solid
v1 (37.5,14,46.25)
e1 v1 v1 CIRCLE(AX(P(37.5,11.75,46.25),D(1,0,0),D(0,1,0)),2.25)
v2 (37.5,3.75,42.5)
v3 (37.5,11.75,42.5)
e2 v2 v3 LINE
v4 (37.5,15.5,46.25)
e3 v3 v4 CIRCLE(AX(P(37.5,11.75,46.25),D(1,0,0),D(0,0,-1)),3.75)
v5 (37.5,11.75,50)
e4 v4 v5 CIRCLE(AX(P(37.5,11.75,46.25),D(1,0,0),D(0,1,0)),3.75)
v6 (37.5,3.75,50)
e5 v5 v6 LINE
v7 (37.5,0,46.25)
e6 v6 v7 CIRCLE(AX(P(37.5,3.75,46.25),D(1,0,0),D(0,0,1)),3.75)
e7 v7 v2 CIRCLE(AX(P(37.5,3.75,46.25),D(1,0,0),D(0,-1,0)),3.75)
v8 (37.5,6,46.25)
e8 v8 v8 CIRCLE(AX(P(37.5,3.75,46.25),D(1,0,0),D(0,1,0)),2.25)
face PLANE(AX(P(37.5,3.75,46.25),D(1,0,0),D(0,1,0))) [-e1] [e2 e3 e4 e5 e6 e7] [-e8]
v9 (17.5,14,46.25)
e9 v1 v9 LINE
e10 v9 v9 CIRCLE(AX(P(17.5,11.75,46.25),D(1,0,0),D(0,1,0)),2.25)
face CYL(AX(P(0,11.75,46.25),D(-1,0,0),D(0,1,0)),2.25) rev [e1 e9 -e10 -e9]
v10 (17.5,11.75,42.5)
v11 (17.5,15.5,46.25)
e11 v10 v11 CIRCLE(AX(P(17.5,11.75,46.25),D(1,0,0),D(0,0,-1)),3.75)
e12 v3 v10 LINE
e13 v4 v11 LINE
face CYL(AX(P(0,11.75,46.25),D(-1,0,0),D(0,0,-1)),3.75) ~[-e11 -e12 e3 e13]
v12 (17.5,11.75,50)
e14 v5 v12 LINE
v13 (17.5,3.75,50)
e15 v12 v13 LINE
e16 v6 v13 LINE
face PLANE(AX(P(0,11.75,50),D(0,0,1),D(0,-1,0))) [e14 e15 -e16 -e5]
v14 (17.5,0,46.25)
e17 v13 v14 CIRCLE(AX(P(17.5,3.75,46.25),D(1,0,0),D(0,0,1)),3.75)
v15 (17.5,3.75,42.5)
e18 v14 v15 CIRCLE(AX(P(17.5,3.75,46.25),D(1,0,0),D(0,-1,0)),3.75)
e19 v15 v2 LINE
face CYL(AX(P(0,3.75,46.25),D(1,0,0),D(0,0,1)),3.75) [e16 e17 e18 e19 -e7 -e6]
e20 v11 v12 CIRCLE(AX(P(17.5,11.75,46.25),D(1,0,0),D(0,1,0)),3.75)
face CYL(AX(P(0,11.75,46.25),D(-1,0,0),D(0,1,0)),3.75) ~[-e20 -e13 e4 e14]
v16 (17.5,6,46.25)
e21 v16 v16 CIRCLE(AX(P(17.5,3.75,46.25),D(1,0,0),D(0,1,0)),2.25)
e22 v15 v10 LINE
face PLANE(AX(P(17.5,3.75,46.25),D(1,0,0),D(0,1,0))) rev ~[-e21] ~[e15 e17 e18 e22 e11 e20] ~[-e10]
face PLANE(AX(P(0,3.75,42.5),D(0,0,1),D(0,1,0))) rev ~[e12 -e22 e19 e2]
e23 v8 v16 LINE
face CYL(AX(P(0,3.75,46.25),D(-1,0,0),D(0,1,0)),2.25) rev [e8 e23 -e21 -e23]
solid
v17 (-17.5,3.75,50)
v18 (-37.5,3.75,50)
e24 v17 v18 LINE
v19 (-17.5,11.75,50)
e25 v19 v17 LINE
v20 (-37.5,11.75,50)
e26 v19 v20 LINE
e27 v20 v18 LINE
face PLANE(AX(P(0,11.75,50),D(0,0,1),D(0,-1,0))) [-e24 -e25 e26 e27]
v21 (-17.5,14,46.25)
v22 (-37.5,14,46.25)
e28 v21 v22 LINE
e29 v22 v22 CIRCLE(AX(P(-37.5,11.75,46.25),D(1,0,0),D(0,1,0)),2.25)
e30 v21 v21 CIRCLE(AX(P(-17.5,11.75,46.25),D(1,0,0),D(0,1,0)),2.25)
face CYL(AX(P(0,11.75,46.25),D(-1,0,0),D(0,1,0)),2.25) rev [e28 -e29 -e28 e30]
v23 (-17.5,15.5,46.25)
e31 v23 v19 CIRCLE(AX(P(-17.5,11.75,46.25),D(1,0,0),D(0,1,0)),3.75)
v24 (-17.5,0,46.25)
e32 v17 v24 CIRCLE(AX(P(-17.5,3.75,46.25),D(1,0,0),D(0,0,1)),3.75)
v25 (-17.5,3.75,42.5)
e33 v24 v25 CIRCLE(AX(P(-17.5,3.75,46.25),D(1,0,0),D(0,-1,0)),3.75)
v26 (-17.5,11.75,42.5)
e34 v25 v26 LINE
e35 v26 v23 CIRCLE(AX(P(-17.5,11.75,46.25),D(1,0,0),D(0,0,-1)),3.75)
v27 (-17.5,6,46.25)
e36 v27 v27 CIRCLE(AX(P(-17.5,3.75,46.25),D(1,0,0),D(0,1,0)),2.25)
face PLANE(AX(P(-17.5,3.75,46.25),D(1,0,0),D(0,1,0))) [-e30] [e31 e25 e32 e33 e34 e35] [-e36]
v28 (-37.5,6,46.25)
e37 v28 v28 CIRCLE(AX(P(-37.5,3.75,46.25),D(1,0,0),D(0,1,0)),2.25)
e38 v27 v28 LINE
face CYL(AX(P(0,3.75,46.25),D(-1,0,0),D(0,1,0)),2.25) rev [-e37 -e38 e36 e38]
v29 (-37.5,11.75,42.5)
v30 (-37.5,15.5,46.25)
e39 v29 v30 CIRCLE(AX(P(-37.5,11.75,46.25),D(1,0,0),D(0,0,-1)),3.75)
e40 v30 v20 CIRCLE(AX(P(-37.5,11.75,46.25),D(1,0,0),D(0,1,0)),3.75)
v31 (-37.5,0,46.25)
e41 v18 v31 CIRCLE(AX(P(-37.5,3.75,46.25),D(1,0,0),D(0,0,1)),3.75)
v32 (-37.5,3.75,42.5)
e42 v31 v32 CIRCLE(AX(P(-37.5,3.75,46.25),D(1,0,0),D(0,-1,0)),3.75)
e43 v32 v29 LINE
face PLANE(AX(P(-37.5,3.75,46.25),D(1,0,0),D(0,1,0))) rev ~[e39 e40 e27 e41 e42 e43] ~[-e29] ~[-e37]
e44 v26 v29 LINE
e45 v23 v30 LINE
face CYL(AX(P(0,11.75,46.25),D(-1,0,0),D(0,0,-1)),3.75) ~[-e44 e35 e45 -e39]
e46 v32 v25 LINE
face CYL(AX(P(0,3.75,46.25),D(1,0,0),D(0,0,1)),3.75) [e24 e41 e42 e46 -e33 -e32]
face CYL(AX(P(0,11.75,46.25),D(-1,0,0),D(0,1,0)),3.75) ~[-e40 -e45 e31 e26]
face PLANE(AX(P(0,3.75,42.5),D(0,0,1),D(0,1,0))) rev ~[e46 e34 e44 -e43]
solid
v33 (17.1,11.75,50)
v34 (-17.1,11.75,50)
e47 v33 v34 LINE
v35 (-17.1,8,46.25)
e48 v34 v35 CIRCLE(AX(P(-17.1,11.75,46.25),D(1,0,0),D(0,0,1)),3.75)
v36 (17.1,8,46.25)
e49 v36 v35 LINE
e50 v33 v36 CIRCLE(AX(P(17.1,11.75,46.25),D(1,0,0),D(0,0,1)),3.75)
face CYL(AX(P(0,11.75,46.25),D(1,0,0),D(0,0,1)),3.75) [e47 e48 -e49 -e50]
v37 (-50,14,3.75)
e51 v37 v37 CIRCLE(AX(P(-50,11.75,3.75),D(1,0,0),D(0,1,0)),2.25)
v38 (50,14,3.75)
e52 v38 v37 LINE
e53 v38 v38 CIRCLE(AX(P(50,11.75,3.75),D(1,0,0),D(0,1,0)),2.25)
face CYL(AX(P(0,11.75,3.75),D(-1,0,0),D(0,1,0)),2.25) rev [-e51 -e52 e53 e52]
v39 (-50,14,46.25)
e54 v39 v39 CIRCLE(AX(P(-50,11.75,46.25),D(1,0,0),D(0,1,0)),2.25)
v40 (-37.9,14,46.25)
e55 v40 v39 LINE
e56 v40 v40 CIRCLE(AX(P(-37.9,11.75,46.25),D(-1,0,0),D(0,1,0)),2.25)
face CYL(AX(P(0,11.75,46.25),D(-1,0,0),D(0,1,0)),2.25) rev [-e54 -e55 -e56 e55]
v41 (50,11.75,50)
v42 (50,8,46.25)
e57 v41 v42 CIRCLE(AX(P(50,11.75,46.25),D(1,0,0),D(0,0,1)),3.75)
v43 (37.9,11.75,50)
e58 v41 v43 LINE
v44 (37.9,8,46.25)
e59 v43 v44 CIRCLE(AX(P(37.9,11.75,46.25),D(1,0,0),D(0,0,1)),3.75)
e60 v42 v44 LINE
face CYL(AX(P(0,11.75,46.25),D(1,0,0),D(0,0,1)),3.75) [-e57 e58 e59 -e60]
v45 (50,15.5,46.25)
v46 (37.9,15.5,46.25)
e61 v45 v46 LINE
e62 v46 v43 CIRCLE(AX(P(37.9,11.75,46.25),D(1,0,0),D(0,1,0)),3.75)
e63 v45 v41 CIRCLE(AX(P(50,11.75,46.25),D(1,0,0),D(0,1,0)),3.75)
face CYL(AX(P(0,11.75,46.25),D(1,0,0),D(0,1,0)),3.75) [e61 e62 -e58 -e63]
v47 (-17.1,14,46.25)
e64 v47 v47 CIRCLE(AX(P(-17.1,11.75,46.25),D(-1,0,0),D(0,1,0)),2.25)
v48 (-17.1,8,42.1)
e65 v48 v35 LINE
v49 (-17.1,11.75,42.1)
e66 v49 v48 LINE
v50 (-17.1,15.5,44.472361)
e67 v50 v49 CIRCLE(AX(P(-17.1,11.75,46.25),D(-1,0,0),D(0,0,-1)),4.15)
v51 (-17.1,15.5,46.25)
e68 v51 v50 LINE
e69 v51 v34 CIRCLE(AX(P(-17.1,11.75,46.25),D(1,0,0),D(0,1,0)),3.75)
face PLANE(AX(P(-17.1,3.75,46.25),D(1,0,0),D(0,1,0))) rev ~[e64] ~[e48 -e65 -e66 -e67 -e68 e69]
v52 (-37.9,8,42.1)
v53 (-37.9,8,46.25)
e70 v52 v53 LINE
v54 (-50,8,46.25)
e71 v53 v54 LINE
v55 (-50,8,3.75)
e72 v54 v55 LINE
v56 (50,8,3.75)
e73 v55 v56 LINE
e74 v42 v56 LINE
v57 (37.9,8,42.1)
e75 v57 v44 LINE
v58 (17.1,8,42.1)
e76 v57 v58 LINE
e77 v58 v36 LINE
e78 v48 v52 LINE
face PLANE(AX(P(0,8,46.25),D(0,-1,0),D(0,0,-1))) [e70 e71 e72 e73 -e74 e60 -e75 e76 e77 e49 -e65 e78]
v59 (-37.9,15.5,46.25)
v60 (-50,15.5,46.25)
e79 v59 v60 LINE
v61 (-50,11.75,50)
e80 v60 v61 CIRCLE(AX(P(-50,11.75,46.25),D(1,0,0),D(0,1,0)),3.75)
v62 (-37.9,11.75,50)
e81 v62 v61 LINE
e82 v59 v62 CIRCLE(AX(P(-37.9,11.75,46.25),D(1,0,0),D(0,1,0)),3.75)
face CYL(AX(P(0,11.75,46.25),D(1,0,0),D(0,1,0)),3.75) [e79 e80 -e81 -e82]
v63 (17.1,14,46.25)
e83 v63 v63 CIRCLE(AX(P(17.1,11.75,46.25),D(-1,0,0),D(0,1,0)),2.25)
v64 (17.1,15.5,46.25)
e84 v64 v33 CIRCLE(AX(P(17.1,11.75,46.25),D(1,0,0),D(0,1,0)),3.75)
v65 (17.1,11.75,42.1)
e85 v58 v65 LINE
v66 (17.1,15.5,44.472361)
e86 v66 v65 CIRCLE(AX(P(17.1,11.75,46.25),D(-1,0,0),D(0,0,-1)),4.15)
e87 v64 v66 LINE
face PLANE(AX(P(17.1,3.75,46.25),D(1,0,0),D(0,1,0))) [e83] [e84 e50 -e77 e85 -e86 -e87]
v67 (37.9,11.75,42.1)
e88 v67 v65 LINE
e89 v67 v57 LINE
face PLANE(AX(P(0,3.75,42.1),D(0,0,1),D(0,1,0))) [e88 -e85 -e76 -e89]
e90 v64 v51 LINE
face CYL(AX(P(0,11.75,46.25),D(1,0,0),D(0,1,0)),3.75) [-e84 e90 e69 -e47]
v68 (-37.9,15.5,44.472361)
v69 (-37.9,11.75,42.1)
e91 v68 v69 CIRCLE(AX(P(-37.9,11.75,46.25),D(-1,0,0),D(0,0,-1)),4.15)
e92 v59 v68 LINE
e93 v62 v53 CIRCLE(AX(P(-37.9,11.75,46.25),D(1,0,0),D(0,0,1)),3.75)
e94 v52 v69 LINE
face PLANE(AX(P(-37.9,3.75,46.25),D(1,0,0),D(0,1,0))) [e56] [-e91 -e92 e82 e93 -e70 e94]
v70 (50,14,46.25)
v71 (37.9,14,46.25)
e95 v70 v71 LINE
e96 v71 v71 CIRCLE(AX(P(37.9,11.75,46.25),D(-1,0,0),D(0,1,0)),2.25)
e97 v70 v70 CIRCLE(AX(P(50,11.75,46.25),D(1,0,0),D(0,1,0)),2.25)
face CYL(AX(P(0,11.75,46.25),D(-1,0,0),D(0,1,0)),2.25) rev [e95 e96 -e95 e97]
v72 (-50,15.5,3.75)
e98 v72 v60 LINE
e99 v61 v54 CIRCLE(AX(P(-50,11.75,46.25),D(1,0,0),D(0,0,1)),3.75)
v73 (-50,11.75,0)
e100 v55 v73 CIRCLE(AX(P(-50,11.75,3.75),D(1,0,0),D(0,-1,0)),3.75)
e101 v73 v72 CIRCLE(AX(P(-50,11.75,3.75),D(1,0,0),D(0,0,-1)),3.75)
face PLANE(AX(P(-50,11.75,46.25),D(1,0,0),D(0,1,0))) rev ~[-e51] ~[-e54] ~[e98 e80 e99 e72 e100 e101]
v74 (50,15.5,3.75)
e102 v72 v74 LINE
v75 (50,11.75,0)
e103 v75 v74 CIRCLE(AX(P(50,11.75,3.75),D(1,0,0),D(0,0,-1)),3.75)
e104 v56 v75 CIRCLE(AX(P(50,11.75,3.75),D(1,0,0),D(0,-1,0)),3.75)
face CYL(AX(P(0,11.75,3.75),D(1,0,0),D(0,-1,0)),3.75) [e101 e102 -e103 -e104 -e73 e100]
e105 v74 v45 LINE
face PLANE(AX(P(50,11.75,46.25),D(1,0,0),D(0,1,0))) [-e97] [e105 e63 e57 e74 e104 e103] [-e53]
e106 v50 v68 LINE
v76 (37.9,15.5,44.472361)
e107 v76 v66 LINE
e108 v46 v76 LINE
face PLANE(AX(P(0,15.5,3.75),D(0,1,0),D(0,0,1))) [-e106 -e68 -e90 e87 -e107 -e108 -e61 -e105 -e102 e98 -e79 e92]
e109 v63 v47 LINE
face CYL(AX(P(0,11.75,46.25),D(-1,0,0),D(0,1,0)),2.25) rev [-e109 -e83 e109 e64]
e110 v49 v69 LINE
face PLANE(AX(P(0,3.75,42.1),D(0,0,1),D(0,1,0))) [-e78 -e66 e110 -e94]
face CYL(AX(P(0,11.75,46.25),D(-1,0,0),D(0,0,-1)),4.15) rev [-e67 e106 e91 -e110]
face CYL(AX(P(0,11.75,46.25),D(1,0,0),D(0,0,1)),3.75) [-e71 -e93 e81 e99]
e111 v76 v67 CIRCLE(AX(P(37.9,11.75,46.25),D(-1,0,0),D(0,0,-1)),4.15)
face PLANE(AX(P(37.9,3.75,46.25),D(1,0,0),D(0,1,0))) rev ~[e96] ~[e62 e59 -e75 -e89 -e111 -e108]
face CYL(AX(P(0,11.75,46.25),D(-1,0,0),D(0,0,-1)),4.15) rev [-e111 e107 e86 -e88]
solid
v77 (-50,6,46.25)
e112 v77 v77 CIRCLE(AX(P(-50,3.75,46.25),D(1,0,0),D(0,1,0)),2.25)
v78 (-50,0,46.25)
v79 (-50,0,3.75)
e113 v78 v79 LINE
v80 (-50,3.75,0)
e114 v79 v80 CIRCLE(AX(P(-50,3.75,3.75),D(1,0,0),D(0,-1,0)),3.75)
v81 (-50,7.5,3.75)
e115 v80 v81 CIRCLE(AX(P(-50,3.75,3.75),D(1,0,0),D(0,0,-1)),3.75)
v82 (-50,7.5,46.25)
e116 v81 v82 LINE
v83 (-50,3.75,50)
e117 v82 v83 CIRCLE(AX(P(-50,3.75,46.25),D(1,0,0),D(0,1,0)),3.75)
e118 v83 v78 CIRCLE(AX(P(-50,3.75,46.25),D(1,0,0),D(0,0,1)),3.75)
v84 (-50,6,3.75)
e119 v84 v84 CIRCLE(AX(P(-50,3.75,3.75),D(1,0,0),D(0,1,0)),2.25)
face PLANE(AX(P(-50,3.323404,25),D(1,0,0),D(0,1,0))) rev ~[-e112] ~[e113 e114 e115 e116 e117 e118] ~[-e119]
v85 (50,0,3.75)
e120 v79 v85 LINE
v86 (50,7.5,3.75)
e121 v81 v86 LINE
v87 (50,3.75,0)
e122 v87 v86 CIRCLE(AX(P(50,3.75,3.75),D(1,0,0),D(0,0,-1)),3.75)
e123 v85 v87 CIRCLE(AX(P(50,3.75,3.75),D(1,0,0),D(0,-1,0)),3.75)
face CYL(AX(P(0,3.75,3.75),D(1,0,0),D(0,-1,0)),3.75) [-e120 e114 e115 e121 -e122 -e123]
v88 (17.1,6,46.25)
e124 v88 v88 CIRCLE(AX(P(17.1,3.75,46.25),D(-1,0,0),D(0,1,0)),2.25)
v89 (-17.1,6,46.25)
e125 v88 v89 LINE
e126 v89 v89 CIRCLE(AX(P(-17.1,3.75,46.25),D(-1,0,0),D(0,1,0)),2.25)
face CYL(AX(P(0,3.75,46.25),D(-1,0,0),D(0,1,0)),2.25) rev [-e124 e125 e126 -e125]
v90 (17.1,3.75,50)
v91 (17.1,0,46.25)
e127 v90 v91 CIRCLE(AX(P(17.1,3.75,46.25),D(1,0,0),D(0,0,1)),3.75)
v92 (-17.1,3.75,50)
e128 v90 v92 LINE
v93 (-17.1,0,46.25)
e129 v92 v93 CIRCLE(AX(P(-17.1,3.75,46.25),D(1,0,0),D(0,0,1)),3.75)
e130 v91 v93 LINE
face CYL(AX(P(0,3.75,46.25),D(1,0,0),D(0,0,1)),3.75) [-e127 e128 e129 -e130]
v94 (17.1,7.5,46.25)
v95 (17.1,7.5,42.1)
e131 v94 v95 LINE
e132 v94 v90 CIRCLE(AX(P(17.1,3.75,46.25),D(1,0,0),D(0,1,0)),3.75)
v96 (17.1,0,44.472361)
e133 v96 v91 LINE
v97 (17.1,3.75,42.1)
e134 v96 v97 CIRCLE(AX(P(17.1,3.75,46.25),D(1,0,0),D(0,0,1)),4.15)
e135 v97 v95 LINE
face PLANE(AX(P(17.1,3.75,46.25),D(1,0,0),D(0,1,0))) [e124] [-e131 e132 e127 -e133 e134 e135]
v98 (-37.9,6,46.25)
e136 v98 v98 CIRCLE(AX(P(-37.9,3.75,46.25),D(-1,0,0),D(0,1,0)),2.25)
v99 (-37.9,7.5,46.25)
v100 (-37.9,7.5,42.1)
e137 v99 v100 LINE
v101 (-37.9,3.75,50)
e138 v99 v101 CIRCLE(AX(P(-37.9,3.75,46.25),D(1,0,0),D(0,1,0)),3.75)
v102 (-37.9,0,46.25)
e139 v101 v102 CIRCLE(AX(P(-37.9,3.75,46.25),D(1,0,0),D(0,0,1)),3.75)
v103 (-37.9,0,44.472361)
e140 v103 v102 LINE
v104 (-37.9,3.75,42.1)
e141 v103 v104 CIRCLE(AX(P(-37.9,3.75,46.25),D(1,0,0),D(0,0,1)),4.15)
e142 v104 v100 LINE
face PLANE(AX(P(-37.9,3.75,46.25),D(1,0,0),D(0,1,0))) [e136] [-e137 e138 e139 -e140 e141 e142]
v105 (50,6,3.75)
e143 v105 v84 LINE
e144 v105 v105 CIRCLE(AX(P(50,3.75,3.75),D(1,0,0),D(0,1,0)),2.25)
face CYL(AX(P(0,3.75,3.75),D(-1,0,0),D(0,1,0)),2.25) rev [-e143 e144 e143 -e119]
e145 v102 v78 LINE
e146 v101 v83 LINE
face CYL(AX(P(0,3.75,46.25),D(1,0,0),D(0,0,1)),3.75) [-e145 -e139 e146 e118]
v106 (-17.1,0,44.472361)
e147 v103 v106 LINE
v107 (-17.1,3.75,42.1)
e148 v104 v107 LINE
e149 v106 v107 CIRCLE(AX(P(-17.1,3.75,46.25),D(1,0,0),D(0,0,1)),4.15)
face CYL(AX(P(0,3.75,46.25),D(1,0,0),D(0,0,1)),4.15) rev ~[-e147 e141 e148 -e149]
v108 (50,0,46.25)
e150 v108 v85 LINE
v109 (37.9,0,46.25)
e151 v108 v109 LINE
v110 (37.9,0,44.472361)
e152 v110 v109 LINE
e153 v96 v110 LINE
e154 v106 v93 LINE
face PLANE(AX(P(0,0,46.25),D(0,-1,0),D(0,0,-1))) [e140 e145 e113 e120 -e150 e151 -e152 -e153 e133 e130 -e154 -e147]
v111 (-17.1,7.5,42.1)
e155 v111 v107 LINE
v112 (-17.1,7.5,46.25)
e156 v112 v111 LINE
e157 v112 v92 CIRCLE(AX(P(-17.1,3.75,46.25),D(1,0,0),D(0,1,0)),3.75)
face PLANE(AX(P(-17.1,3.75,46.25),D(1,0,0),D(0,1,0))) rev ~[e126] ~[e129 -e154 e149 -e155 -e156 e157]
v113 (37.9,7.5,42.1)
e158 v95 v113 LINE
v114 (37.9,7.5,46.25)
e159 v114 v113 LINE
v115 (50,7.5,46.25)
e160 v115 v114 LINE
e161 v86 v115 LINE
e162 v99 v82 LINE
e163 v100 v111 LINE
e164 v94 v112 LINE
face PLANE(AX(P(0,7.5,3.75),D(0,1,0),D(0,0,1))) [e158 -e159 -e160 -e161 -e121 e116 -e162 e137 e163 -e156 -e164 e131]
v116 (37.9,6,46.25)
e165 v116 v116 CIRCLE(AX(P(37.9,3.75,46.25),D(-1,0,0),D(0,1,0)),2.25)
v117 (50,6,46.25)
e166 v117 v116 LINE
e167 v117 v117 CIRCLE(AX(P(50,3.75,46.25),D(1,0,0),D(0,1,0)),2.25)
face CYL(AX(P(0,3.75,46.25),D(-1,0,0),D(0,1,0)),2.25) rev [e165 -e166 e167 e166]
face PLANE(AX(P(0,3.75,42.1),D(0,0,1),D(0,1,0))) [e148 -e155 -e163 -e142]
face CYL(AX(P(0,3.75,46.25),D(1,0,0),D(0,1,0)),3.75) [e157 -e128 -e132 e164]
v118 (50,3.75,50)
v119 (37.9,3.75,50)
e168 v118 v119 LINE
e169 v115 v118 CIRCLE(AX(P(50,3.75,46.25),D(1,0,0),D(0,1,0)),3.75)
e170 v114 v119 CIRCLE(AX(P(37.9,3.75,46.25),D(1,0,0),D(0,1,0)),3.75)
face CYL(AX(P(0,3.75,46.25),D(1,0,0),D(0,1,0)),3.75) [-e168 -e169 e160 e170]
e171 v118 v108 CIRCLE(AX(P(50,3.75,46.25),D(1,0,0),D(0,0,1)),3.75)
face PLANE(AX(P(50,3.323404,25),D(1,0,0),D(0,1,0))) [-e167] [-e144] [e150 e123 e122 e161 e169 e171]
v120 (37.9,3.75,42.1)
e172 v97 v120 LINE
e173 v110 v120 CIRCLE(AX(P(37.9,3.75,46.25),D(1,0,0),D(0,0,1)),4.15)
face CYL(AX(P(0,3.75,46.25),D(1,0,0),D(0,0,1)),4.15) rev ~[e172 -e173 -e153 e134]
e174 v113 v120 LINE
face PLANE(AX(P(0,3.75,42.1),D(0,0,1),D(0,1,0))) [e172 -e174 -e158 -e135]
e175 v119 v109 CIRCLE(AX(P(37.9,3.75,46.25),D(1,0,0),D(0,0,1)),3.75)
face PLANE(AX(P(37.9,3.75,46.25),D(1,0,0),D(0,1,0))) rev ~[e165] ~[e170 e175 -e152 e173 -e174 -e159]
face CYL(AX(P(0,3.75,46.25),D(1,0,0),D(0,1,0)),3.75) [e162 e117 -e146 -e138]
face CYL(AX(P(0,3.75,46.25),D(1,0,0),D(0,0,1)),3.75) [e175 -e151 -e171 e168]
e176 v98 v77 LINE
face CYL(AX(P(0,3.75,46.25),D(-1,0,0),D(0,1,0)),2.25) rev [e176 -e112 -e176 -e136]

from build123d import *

# Parameters (mm, degrees)
F0_R      = 2.25
F1_DEPTH  = 50
F2_DEPTH  = 37.5
F3_DEPTH  = 17.5
F4_OFFSET = 0.4


with BuildPart() as f1:
    # F0 (on Right) → F1 (new body, symmetric)
    with BuildSketch(Plane.YZ):
        with BuildLine():
            Line((0, 46.25), (0, 3.75))
            ThreePointArc((0, 3.75), (1.0983495706, 6.4016504294), (3.75, 7.5))
            Line((3.75, 7.5), (7.5, 7.5))
            Line((7.5, 7.5), (7.5, 42.5))
            Line((7.5, 42.5), (3.75, 42.5))
            ThreePointArc((3.75, 42.5), (1.0983495706, 43.5983495706), (0, 46.25))
        make_face()
        with BuildLine():
            ThreePointArc((0, 3.75), (1.0983495706, 1.0983495706), (3.75, 0))
            ThreePointArc((3.75, 0), (6.4016504294, 1.0983495706), (7.5, 3.75))
            ThreePointArc((7.5, 3.75), (6.4016504294, 6.4016504294), (3.75, 7.5))
            ThreePointArc((3.75, 7.5), (1.0983495706, 6.4016504294), (0, 3.75))
        make_face()
        with Locations((3.75, 3.75)):
            Circle(F0_R, mode=Mode.SUBTRACT)
        with BuildLine():
            ThreePointArc((3.75, 7.5), (6.4016504294, 6.4016504294), (7.5, 3.75))
            Line((7.5, 3.75), (7.5, 7.5))
            Line((7.5, 7.5), (3.75, 7.5))
        make_face()
        with BuildLine():
            ThreePointArc((7.5, 46.25), (6.4016504294, 43.5983495706), (3.75, 42.5))
            Line((3.75, 42.5), (7.5, 42.5))
            Line((7.5, 42.5), (7.5, 46.25))
        make_face()
        with BuildLine():
            ThreePointArc((3.75, 50), (1.0983495706, 48.9016504294), (0, 46.25))
            ThreePointArc((0, 46.25), (1.0983495706, 43.5983495706), (3.75, 42.5))
            ThreePointArc((3.75, 42.5), (6.4016504294, 43.5983495706), (7.5, 46.25))
            ThreePointArc((7.5, 46.25), (6.4016504294, 48.9016504294), (3.75, 50))
        make_face()
        with Locations((3.75, 46.25)):
            Circle(F0_R, mode=Mode.SUBTRACT)
    extrude(amount=F1_DEPTH, both=True)


with BuildPart() as f1b:
    # F0 (on Right) → F1, piece 2 (new body, symmetric)
    with BuildSketch(Plane.YZ):
        with BuildLine():
            ThreePointArc((15.5, 46.25), (14.4016504294, 48.9016504294), (11.75, 50))
            ThreePointArc((11.75, 50), (9.0983495706, 48.9016504294), (8, 46.25))
            ThreePointArc((8, 46.25), (9.0983495706, 43.5983495706), (11.75, 42.5))
            ThreePointArc((11.75, 42.5), (14.4016504294, 43.5983495706), (15.5, 46.25))
        make_face()
        with Locations((11.75, 46.25)):
            Circle(F0_R, mode=Mode.SUBTRACT)
        with BuildLine():
            Line((8, 46.25), (8, 42.5))
            Line((8, 42.5), (11.75, 42.5))
            ThreePointArc((11.75, 42.5), (9.0983495706, 43.5983495706), (8, 46.25))
        make_face()
        with BuildLine():
            Line((8, 42.5), (8, 7.5))
            Line((8, 7.5), (11.75, 7.5))
            Line((11.75, 7.5), (15.5, 7.5))
            Line((15.5, 7.5), (15.5, 46.25))
            ThreePointArc((15.5, 46.25), (14.4016504294, 43.5983495706), (11.75, 42.5))
            Line((11.75, 42.5), (8, 42.5))
        make_face()
        with BuildLine():
            ThreePointArc((11.75, 7.5), (14.4016504294, 6.4016504294), (15.5, 3.75))
            Line((15.5, 3.75), (15.5, 7.5))
            Line((15.5, 7.5), (11.75, 7.5))
        make_face()
        with BuildLine():
            Line((8, 7.5), (8, 3.75))
            ThreePointArc((8, 3.75), (9.0983495706, 6.4016504294), (11.75, 7.5))
            Line((11.75, 7.5), (8, 7.5))
        make_face()
        with BuildLine():
            ThreePointArc((8, 3.75), (9.0983495706, 1.0983495706), (11.75, 0))
            ThreePointArc((11.75, 0), (14.4016504294, 1.0983495706), (15.5, 3.75))
            ThreePointArc((15.5, 3.75), (14.4016504294, 6.4016504294), (11.75, 7.5))
            ThreePointArc((11.75, 7.5), (9.0983495706, 6.4016504294), (8, 3.75))
        make_face()
        with Locations((11.75, 3.75)):
            Circle(F0_R, mode=Mode.SUBTRACT)
        with BuildLine():
            Line((8, 42.5), (8, 7.5))
            Line((8, 7.5), (11.75, 7.5))
            Line((11.75, 7.5), (15.5, 7.5))
            Line((15.5, 7.5), (15.5, 46.25))
            ThreePointArc((15.5, 46.25), (14.4016504294, 43.5983495706), (11.75, 42.5))
            Line((11.75, 42.5), (8, 42.5))
        make_face()
    extrude(amount=F1_DEPTH, both=True)


with BuildPart() as f2:
    # F0 (on Right) → F2 (new body, symmetric)
    with BuildSketch(Plane.YZ):
        with BuildLine():
            ThreePointArc((3.75, 50), (1.0983495706, 48.9016504294), (0, 46.25))
            ThreePointArc((0, 46.25), (1.0983495706, 43.5983495706), (3.75, 42.5))
            ThreePointArc((3.75, 42.5), (6.4016504294, 43.5983495706), (7.5, 46.25))
            ThreePointArc((7.5, 46.25), (6.4016504294, 48.9016504294), (3.75, 50))
        make_face()
        with Locations((3.75, 46.25)):
            Circle(F0_R, mode=Mode.SUBTRACT)
        with BuildLine():
            ThreePointArc((7.5, 46.25), (6.4016504294, 43.5983495706), (3.75, 42.5))
            Line((3.75, 42.5), (7.5, 42.5))
            Line((7.5, 42.5), (7.5, 46.25))
        make_face()
        with BuildLine():
            Line((7.5, 46.25), (7.5, 42.5))
            Line((7.5, 42.5), (8, 42.5))
            Line((8, 42.5), (8, 46.25))
            ThreePointArc((8, 46.25), (9.0983495706, 48.9016504294), (11.75, 50))
            Line((11.75, 50), (7.5, 50))
            Line((7.5, 50), (7.5, 46.25))
        make_face()
        with BuildLine():
            Line((8, 46.25), (8, 42.5))
            Line((8, 42.5), (11.75, 42.5))
            ThreePointArc((11.75, 42.5), (9.0983495706, 43.5983495706), (8, 46.25))
        make_face()
        with BuildLine():
            Line((7.5, 50), (3.75, 50))
            ThreePointArc((3.75, 50), (6.4016504294, 48.9016504294), (7.5, 46.25))
            Line((7.5, 46.25), (7.5, 50))
        make_face()
        with BuildLine():
            ThreePointArc((15.5, 46.25), (14.4016504294, 48.9016504294), (11.75, 50))
            ThreePointArc((11.75, 50), (9.0983495706, 48.9016504294), (8, 46.25))
            ThreePointArc((8, 46.25), (9.0983495706, 43.5983495706), (11.75, 42.5))
            ThreePointArc((11.75, 42.5), (14.4016504294, 43.5983495706), (15.5, 46.25))
        make_face()
        with Locations((11.75, 46.25)):
            Circle(F0_R, mode=Mode.SUBTRACT)
    extrude(amount=F2_DEPTH, both=True)

    # F0 (on Right) → F3 (cut, symmetric)
    with BuildSketch(Plane.YZ):
        with BuildLine():
            ThreePointArc((3.75, 50), (1.0983495706, 48.9016504294), (0, 46.25))
            ThreePointArc((0, 46.25), (1.0983495706, 43.5983495706), (3.75, 42.5))
            ThreePointArc((3.75, 42.5), (6.4016504294, 43.5983495706), (7.5, 46.25))
            ThreePointArc((7.5, 46.25), (6.4016504294, 48.9016504294), (3.75, 50))
        make_face()
        with Locations((3.75, 46.25)):
            Circle(F0_R, mode=Mode.SUBTRACT)
        with BuildLine():
            Line((7.5, 50), (3.75, 50))
            ThreePointArc((3.75, 50), (6.4016504294, 48.9016504294), (7.5, 46.25))
            Line((7.5, 46.25), (7.5, 50))
        make_face()
        with BuildLine():
            Line((7.5, 46.25), (7.5, 42.5))
            Line((7.5, 42.5), (8, 42.5))
            Line((8, 42.5), (8, 46.25))
            ThreePointArc((8, 46.25), (9.0983495706, 48.9016504294), (11.75, 50))
            Line((11.75, 50), (7.5, 50))
            Line((7.5, 50), (7.5, 46.25))
        make_face()
        with BuildLine():
            ThreePointArc((15.5, 46.25), (14.4016504294, 48.9016504294), (11.75, 50))
            ThreePointArc((11.75, 50), (9.0983495706, 48.9016504294), (8, 46.25))
            ThreePointArc((8, 46.25), (9.0983495706, 43.5983495706), (11.75, 42.5))
            ThreePointArc((11.75, 42.5), (14.4016504294, 43.5983495706), (15.5, 46.25))
        make_face()
        with Locations((11.75, 46.25)):
            Circle(F0_R, mode=Mode.SUBTRACT)
        with BuildLine():
            Line((8, 46.25), (8, 42.5))
            Line((8, 42.5), (11.75, 42.5))
            ThreePointArc((11.75, 42.5), (9.0983495706, 43.5983495706), (8, 46.25))
        make_face()
        with BuildLine():
            ThreePointArc((7.5, 46.25), (6.4016504294, 43.5983495706), (3.75, 42.5))
            Line((3.75, 42.5), (7.5, 42.5))
            Line((7.5, 42.5), (7.5, 46.25))
        make_face()
    extrude(amount=F3_DEPTH, both=True, mode=Mode.SUBTRACT)


with BuildPart() as f1_1:
    add(f1.part)

    # F4: cut F2, made larger all round first
    f4_tool = offset(f2.part, amount=F4_OFFSET, kind=Kind.INTERSECTION, mode=Mode.PRIVATE)
    add(f4_tool, mode=Mode.SUBTRACT)


with BuildPart() as f1b_1:
    add(f1b.part)

    # F4: cut F2, made larger all round first
    f4_tool = offset(f2.part, amount=F4_OFFSET, kind=Kind.INTERSECTION, mode=Mode.PRIVATE)
    add(f4_tool, mode=Mode.SUBTRACT)


solid = Compound([f2.part, f1_1.part, f1b_1.part])
